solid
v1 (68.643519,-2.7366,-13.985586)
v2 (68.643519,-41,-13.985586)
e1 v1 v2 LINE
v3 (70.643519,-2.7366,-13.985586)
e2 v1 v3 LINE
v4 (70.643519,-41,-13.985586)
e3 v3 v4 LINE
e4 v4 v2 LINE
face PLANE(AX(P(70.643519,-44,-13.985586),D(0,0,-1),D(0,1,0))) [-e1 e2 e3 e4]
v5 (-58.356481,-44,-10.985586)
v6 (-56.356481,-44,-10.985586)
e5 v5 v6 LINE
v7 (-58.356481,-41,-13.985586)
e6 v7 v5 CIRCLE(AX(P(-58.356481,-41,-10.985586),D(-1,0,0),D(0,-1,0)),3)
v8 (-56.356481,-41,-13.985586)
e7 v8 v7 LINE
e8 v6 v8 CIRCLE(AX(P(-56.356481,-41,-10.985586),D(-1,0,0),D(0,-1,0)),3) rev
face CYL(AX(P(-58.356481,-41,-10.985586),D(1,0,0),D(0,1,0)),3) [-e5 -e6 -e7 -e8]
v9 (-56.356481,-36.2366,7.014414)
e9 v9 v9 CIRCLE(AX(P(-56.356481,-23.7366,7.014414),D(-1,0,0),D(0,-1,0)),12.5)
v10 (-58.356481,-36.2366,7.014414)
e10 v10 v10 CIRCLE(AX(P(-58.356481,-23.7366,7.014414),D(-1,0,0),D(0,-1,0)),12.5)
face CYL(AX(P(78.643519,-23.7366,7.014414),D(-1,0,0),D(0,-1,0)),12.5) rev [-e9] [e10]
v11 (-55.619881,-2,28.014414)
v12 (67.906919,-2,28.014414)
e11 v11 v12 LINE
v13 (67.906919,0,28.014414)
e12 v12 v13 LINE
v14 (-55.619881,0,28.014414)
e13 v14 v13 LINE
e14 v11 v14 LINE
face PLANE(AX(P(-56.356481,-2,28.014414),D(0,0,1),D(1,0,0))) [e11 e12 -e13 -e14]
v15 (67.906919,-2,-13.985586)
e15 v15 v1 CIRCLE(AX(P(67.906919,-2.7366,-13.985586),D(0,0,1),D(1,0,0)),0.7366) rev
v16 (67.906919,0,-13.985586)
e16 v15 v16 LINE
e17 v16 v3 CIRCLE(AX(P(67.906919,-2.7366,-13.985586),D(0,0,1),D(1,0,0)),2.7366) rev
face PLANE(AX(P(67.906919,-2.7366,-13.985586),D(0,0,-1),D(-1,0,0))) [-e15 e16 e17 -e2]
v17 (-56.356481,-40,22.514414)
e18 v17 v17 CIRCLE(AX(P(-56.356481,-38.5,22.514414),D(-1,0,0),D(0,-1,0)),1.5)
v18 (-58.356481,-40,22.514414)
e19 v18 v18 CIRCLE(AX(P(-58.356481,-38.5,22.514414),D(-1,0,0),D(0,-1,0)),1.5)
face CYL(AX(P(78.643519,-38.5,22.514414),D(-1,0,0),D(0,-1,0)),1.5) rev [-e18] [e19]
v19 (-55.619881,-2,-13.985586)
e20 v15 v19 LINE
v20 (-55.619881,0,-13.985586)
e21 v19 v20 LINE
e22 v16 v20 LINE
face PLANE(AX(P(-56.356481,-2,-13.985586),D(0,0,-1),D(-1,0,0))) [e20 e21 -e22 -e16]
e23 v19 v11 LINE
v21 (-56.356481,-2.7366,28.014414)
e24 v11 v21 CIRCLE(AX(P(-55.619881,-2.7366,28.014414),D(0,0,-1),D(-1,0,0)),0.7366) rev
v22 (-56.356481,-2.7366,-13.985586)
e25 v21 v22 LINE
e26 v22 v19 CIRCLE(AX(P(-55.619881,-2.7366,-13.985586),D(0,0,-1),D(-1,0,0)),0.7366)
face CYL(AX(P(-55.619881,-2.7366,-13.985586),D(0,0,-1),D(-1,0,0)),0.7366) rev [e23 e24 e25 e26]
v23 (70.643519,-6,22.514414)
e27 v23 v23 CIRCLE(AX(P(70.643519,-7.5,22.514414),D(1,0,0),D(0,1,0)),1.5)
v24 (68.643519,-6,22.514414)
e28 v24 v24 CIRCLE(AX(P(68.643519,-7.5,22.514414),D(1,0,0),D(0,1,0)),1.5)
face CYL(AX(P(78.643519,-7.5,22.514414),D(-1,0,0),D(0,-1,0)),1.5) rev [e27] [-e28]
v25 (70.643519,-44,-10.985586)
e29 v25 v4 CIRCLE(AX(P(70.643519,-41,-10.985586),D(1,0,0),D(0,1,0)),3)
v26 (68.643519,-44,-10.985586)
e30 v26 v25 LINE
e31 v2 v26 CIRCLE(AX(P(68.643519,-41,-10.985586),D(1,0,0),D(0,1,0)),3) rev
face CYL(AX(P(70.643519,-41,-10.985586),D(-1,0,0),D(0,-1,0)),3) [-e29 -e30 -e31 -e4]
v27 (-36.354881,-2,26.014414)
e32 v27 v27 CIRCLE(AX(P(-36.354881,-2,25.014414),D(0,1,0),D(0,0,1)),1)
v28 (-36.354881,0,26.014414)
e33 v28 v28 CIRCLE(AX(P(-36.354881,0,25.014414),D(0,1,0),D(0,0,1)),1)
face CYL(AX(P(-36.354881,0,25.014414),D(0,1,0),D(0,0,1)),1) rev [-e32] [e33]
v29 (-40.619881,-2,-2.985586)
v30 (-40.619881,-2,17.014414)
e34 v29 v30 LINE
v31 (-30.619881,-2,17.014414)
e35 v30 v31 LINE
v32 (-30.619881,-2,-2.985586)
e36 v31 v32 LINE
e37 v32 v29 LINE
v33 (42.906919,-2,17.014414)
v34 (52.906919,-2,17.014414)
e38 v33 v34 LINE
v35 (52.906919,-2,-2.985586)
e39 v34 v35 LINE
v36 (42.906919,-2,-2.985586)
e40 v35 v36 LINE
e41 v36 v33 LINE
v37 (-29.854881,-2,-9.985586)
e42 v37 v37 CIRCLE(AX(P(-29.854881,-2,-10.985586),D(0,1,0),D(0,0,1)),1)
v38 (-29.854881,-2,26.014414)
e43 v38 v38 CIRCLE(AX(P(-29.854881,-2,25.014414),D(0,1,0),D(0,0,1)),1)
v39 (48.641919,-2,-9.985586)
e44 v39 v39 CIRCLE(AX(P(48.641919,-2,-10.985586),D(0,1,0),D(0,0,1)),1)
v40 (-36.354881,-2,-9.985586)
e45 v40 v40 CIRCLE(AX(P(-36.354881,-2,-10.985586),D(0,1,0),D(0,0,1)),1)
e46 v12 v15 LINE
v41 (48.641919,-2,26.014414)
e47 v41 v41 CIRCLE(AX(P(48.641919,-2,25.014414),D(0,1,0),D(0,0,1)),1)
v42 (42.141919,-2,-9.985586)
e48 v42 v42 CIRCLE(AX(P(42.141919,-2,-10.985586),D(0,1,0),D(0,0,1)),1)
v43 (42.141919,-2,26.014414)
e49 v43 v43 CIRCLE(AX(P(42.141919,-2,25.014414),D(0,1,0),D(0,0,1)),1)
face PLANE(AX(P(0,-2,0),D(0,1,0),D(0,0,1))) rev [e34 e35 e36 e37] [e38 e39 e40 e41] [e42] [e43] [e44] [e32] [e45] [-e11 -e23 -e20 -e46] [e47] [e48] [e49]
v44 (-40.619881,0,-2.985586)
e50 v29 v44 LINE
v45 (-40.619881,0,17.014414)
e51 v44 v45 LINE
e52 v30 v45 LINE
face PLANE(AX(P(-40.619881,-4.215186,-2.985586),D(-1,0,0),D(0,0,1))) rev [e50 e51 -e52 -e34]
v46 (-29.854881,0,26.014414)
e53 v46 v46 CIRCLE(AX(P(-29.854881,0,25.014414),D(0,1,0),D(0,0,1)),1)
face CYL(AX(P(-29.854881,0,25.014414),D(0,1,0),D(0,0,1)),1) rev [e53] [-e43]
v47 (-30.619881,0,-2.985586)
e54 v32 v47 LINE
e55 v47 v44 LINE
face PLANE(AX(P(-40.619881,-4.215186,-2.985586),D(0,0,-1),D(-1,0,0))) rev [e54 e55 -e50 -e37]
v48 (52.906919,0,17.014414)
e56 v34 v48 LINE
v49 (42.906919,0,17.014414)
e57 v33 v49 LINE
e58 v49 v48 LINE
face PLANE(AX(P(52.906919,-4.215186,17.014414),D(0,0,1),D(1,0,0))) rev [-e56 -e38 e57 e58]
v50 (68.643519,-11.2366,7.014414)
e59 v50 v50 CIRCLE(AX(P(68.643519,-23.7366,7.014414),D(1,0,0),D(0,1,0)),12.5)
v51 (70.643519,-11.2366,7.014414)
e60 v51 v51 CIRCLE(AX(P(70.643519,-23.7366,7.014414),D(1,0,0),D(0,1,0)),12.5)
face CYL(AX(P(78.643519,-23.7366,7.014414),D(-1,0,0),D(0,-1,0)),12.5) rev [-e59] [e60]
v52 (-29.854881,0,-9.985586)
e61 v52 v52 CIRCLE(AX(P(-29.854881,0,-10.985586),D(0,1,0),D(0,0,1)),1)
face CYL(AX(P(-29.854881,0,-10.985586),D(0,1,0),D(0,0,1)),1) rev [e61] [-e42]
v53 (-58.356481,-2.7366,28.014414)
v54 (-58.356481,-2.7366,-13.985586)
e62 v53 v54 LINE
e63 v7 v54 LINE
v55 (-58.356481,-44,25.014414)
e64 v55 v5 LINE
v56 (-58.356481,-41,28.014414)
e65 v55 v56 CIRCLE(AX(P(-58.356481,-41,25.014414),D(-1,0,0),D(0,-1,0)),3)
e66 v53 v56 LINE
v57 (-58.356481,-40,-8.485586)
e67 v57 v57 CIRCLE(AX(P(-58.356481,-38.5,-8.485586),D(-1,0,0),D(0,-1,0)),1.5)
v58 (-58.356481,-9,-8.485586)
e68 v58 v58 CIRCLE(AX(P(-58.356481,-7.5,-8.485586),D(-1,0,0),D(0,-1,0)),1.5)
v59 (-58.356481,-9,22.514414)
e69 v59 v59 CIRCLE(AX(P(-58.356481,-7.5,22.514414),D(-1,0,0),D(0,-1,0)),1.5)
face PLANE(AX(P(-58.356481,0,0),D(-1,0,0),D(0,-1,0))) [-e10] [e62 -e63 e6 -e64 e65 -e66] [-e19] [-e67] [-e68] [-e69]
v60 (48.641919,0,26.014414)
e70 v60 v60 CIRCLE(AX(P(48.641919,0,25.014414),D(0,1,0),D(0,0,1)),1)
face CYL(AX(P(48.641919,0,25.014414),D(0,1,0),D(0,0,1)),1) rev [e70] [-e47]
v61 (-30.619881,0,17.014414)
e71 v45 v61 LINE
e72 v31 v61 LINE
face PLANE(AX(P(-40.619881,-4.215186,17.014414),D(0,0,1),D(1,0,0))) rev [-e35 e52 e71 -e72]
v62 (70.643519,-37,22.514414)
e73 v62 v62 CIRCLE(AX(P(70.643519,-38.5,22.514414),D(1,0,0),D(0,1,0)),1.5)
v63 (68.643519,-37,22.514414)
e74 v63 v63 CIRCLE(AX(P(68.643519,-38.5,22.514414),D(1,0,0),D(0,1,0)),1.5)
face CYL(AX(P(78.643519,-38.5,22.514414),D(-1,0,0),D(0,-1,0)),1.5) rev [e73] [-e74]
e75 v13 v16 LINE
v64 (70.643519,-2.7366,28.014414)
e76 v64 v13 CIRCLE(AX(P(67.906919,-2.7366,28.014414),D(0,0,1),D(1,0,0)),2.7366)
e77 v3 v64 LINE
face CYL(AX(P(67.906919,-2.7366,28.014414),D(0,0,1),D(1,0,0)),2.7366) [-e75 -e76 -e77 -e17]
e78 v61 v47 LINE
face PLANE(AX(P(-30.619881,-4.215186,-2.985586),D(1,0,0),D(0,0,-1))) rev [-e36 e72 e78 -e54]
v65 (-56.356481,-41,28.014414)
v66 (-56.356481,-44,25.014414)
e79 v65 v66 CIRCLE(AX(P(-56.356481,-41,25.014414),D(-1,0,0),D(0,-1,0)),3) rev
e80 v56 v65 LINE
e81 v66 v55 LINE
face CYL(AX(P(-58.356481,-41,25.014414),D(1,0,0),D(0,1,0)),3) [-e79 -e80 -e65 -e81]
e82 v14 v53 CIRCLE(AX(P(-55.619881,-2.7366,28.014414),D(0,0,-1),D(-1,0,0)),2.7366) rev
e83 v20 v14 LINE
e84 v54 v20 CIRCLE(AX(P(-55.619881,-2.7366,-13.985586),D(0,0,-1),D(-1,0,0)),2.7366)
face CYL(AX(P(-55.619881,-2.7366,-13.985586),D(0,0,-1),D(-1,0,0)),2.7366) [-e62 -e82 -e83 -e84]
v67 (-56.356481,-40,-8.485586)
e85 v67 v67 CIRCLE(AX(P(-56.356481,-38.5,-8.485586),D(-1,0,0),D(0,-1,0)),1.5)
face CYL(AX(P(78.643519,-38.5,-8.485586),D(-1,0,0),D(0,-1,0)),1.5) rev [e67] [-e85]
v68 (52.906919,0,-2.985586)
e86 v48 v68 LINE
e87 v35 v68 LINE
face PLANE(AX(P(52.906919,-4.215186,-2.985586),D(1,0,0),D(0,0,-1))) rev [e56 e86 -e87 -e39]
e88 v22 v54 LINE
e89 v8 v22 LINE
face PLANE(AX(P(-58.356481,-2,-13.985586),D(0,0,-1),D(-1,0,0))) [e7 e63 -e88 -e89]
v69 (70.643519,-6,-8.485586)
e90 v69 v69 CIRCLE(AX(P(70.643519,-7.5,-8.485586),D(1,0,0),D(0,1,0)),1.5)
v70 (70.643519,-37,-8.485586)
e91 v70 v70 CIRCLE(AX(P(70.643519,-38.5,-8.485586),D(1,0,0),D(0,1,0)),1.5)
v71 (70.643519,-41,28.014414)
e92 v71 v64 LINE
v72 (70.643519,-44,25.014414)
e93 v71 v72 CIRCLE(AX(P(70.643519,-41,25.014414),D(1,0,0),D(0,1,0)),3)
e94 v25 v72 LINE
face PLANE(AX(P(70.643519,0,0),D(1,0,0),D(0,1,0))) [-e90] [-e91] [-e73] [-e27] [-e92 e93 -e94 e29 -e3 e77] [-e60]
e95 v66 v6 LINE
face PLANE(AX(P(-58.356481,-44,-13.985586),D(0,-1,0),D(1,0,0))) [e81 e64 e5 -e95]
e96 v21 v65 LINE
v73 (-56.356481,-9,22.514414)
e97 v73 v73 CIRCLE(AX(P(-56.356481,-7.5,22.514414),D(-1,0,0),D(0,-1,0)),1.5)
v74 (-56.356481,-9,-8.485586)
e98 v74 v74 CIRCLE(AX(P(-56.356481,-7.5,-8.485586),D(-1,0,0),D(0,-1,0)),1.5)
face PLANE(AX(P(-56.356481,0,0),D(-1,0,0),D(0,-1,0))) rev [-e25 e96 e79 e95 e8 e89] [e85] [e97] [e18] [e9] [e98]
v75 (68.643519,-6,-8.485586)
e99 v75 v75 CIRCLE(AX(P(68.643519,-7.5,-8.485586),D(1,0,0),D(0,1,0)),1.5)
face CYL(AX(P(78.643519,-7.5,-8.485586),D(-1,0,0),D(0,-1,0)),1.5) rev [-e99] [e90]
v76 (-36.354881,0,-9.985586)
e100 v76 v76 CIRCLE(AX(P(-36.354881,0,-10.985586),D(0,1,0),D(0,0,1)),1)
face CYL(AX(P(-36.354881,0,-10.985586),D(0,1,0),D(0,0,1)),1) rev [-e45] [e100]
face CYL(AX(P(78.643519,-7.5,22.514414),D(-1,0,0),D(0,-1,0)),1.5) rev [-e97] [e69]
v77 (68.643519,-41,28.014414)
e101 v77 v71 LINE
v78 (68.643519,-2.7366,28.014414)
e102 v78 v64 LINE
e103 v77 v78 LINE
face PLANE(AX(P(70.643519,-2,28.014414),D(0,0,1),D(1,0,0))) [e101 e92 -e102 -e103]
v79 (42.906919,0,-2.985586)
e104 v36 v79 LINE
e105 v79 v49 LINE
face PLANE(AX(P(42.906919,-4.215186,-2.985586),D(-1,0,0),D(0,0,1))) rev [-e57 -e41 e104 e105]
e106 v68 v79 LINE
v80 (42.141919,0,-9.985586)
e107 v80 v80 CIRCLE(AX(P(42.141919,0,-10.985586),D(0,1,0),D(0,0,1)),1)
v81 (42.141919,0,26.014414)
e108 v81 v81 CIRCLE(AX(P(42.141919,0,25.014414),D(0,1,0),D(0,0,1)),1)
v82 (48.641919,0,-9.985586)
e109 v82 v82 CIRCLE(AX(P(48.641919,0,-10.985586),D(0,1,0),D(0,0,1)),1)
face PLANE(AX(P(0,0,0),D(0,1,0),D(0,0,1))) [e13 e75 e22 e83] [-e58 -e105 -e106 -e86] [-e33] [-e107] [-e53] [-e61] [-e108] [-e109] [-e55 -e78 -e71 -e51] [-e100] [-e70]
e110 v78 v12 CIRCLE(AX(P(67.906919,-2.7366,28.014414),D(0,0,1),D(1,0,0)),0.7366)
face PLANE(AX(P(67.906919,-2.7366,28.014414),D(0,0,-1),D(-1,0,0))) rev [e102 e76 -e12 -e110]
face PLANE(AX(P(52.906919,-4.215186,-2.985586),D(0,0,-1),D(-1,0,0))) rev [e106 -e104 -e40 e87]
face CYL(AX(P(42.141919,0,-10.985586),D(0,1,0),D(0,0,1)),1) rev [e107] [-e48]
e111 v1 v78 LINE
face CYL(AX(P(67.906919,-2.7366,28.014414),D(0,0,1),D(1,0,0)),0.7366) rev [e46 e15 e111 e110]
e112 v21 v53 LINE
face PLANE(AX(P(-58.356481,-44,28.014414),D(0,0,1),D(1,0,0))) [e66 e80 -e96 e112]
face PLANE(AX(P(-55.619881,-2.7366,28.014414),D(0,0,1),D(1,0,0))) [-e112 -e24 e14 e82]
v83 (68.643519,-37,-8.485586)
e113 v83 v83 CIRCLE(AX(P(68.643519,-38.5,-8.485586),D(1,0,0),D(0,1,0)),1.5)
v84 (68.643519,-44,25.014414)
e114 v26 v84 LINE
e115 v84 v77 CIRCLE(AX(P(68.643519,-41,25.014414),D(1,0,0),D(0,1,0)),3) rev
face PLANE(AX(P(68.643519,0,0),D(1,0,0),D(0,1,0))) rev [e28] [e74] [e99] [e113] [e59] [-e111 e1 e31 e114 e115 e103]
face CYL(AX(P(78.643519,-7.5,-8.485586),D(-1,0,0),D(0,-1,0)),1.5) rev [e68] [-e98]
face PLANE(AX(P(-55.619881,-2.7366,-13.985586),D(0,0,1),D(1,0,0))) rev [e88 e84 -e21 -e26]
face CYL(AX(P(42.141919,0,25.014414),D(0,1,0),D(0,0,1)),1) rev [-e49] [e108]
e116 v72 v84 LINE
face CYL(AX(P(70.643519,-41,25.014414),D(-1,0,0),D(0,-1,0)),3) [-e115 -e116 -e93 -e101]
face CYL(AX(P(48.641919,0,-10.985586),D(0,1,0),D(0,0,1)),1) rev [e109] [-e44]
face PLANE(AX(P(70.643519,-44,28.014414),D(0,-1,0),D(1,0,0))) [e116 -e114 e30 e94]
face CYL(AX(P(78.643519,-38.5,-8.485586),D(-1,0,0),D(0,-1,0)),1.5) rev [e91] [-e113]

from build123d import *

# Parameters (mm, degrees)
SKETCH_1_W                         = 125
SKETCH_1_H                         = 42
SM_BASE_FLANGE_490_DEPTH           = 2
SM_EDGE_FLANGE_503_STRIP_W         = 9.4732
SM_EDGE_FLANGE_503_STRIP_H         = 2
SM_EDGE_FLANGE_503_STRIP_CUT_DEPTH = 42
SM_EDGE_FLANGE_503_DEPTH           = 42
SM_EDGE_FLANGE_662_STRIP_W         = 9.4732
SM_EDGE_FLANGE_662_STRIP_H         = 2
SM_EDGE_FLANGE_662_STRIP_CUT_DEPTH = 42
SM_EDGE_FLANGE_662_DEPTH           = 42
FILLET_810_R                       = 3
EXTRUDE_START                      = -129
EXTRUDE_1524_OUTLINE_R             = 1.5
EXTRUDE_1524_OUTLINE_R_2           = 12.5
EXTRUDE_1524_DEPTH                 = 129
EXTRUDE_START_2                    = -2
EXTRUDE_2057_OUTLINE_W             = 10
EXTRUDE_2057_OUTLINE_H             = 20
EXTRUDE_2057_DEPTH                 = 2
HOLE_WIZARD_M2_D                   = 2


# Read off the part's stored shape, not the designer's step: 电机螺丝孔, 车架接口
# Sheet-metal steps are written as plain solids
with BuildPart() as part:
    # Sketch 1 → Sm Base Flange 490 (new body)
    with BuildSketch(Plane(origin=(0, 0, 0), x_dir=(1, 0, 0), z_dir=(0, 1, 0))):
        with Locations((6.143518865, -7.014413587)):
            Rectangle(SKETCH_1_W, SKETCH_1_H)
    extrude(amount=-SM_BASE_FLANGE_490_DEPTH)

    # Sm Edge Flange 503 strip (across the edge) → Sm Edge Flange 503 strip cut (cut)
    with BuildSketch(Plane(origin=(-56.356481135, -2, 28.014413587), x_dir=(1, 0, 0), z_dir=(0, 0, -1))):
        with Locations((-4, -1)):
            Rectangle(SM_EDGE_FLANGE_503_STRIP_W, SM_EDGE_FLANGE_503_STRIP_H)
    extrude(amount=SM_EDGE_FLANGE_503_STRIP_CUT_DEPTH, mode=Mode.SUBTRACT)

    # Sm Edge Flange 503 section (across the edge) → Sm Edge Flange 503 (add)
    with BuildSketch(Plane(origin=(-56.356481135, -2, 28.014413587), x_dir=(1, 0, 0), z_dir=(0, 0, -1))):
        with BuildLine():
            Line((-2, 0.7366), (-2, 42))
            Line((-2, 42), (0, 42))
            Line((0, 42), (0, 0.7366))
            ThreePointArc((0, 0.7366), (0.215745145, 0.215745145), (0.7366, 0))
            Line((0.7366, 0), (0.7366, -2))
            ThreePointArc((0.7366, -2), (-1.198468417, -1.198468417), (-2, 0.7366))
        make_face()
    extrude(amount=SM_EDGE_FLANGE_503_DEPTH)

    # Sm Edge Flange 662 strip (across the edge) → Sm Edge Flange 662 strip cut (cut)
    with BuildSketch(Plane(origin=(68.643518865, -2, -13.985586413), x_dir=(-1, 0, 0), z_dir=(0, 0, 1))):
        with Locations((-4, -1)):
            Rectangle(SM_EDGE_FLANGE_662_STRIP_W, SM_EDGE_FLANGE_662_STRIP_H)
    extrude(amount=SM_EDGE_FLANGE_662_STRIP_CUT_DEPTH, mode=Mode.SUBTRACT)

    # Sm Edge Flange 662 section (across the edge) → Sm Edge Flange 662 (add)
    with BuildSketch(Plane(origin=(68.643518865, -2, -13.985586413), x_dir=(-1, 0, 0), z_dir=(0, 0, 1))):
        with BuildLine():
            Line((-2, 0.7366), (-2, 42))
            Line((-2, 42), (0, 42))
            Line((0, 42), (0, 0.7366))
            ThreePointArc((0, 0.7366), (0.215745145, 0.215745145), (0.7366, 0))
            Line((0.7366, 0), (0.7366, -2))
            ThreePointArc((0.7366, -2), (-1.198468417, -1.198468417), (-2, 0.7366))
        make_face()
    extrude(amount=SM_EDGE_FLANGE_662_DEPTH)

    # Fillet 810
    fillet_810_edges = [part.edges().sort_by_distance(p)[0] for p in [
        (-57.356481135, -44, 28.014413587),
        (-57.356481135, -44, -13.985586413),
        (69.643518865, -44, -13.985586413),
        (69.643518865, -44, 28.014413587),
    ]]
    fillet(fillet_810_edges, radius=FILLET_810_R)

    # Extrude 1524 outline → Extrude 1524 (cut)
    with BuildSketch(Plane.ZY.offset(58.356481135).offset(EXTRUDE_START)):
        with Locations((-8.485586413, -7.5)):
            Circle(EXTRUDE_1524_OUTLINE_R)
        with Locations((22.514413587, -7.5)):
            Circle(EXTRUDE_1524_OUTLINE_R)
        with Locations((22.514413587, -38.5)):
            Circle(EXTRUDE_1524_OUTLINE_R)
        with Locations((-8.485586413, -38.5)):
            Circle(EXTRUDE_1524_OUTLINE_R)
        with Locations((7.014413587, -23.7366)):
            Circle(EXTRUDE_1524_OUTLINE_R_2)
    extrude(amount=EXTRUDE_1524_DEPTH, mode=Mode.SUBTRACT)

    # Extrude 2057 outline → Extrude 2057 (cut)
    with BuildSketch(Plane(origin=(0, 0, 0), x_dir=(1, 0, 0), z_dir=(0, 1, 0)).offset(EXTRUDE_START_2)):
        with Locations((47.906918865, -7.014413587)):
            Rectangle(EXTRUDE_2057_OUTLINE_W, EXTRUDE_2057_OUTLINE_H)
        with Locations((-35.619881135, -7.014413587)):
            Rectangle(EXTRUDE_2057_OUTLINE_W, EXTRUDE_2057_OUTLINE_H)
    extrude(amount=EXTRUDE_2057_DEPTH, mode=Mode.SUBTRACT)

    # M2螺纹孔 (through all)
    with Locations(Plane(origin=(0, 0, 0), x_dir=(1, 0, 0), z_dir=(0, 1, 0))):
        with Locations((-29.854881135, 10.985586413), (42.141918865, 10.985586413), (42.141918865, -25.014413587), (-29.854881135, -25.014413587), (-36.354881135, 10.985586413), (48.641918865, 10.985586413), (48.641918865, -25.014413587), (-36.354881135, -25.014413587)):
            Hole(HOLE_WIZARD_M2_D / 2)


solid = part.part
